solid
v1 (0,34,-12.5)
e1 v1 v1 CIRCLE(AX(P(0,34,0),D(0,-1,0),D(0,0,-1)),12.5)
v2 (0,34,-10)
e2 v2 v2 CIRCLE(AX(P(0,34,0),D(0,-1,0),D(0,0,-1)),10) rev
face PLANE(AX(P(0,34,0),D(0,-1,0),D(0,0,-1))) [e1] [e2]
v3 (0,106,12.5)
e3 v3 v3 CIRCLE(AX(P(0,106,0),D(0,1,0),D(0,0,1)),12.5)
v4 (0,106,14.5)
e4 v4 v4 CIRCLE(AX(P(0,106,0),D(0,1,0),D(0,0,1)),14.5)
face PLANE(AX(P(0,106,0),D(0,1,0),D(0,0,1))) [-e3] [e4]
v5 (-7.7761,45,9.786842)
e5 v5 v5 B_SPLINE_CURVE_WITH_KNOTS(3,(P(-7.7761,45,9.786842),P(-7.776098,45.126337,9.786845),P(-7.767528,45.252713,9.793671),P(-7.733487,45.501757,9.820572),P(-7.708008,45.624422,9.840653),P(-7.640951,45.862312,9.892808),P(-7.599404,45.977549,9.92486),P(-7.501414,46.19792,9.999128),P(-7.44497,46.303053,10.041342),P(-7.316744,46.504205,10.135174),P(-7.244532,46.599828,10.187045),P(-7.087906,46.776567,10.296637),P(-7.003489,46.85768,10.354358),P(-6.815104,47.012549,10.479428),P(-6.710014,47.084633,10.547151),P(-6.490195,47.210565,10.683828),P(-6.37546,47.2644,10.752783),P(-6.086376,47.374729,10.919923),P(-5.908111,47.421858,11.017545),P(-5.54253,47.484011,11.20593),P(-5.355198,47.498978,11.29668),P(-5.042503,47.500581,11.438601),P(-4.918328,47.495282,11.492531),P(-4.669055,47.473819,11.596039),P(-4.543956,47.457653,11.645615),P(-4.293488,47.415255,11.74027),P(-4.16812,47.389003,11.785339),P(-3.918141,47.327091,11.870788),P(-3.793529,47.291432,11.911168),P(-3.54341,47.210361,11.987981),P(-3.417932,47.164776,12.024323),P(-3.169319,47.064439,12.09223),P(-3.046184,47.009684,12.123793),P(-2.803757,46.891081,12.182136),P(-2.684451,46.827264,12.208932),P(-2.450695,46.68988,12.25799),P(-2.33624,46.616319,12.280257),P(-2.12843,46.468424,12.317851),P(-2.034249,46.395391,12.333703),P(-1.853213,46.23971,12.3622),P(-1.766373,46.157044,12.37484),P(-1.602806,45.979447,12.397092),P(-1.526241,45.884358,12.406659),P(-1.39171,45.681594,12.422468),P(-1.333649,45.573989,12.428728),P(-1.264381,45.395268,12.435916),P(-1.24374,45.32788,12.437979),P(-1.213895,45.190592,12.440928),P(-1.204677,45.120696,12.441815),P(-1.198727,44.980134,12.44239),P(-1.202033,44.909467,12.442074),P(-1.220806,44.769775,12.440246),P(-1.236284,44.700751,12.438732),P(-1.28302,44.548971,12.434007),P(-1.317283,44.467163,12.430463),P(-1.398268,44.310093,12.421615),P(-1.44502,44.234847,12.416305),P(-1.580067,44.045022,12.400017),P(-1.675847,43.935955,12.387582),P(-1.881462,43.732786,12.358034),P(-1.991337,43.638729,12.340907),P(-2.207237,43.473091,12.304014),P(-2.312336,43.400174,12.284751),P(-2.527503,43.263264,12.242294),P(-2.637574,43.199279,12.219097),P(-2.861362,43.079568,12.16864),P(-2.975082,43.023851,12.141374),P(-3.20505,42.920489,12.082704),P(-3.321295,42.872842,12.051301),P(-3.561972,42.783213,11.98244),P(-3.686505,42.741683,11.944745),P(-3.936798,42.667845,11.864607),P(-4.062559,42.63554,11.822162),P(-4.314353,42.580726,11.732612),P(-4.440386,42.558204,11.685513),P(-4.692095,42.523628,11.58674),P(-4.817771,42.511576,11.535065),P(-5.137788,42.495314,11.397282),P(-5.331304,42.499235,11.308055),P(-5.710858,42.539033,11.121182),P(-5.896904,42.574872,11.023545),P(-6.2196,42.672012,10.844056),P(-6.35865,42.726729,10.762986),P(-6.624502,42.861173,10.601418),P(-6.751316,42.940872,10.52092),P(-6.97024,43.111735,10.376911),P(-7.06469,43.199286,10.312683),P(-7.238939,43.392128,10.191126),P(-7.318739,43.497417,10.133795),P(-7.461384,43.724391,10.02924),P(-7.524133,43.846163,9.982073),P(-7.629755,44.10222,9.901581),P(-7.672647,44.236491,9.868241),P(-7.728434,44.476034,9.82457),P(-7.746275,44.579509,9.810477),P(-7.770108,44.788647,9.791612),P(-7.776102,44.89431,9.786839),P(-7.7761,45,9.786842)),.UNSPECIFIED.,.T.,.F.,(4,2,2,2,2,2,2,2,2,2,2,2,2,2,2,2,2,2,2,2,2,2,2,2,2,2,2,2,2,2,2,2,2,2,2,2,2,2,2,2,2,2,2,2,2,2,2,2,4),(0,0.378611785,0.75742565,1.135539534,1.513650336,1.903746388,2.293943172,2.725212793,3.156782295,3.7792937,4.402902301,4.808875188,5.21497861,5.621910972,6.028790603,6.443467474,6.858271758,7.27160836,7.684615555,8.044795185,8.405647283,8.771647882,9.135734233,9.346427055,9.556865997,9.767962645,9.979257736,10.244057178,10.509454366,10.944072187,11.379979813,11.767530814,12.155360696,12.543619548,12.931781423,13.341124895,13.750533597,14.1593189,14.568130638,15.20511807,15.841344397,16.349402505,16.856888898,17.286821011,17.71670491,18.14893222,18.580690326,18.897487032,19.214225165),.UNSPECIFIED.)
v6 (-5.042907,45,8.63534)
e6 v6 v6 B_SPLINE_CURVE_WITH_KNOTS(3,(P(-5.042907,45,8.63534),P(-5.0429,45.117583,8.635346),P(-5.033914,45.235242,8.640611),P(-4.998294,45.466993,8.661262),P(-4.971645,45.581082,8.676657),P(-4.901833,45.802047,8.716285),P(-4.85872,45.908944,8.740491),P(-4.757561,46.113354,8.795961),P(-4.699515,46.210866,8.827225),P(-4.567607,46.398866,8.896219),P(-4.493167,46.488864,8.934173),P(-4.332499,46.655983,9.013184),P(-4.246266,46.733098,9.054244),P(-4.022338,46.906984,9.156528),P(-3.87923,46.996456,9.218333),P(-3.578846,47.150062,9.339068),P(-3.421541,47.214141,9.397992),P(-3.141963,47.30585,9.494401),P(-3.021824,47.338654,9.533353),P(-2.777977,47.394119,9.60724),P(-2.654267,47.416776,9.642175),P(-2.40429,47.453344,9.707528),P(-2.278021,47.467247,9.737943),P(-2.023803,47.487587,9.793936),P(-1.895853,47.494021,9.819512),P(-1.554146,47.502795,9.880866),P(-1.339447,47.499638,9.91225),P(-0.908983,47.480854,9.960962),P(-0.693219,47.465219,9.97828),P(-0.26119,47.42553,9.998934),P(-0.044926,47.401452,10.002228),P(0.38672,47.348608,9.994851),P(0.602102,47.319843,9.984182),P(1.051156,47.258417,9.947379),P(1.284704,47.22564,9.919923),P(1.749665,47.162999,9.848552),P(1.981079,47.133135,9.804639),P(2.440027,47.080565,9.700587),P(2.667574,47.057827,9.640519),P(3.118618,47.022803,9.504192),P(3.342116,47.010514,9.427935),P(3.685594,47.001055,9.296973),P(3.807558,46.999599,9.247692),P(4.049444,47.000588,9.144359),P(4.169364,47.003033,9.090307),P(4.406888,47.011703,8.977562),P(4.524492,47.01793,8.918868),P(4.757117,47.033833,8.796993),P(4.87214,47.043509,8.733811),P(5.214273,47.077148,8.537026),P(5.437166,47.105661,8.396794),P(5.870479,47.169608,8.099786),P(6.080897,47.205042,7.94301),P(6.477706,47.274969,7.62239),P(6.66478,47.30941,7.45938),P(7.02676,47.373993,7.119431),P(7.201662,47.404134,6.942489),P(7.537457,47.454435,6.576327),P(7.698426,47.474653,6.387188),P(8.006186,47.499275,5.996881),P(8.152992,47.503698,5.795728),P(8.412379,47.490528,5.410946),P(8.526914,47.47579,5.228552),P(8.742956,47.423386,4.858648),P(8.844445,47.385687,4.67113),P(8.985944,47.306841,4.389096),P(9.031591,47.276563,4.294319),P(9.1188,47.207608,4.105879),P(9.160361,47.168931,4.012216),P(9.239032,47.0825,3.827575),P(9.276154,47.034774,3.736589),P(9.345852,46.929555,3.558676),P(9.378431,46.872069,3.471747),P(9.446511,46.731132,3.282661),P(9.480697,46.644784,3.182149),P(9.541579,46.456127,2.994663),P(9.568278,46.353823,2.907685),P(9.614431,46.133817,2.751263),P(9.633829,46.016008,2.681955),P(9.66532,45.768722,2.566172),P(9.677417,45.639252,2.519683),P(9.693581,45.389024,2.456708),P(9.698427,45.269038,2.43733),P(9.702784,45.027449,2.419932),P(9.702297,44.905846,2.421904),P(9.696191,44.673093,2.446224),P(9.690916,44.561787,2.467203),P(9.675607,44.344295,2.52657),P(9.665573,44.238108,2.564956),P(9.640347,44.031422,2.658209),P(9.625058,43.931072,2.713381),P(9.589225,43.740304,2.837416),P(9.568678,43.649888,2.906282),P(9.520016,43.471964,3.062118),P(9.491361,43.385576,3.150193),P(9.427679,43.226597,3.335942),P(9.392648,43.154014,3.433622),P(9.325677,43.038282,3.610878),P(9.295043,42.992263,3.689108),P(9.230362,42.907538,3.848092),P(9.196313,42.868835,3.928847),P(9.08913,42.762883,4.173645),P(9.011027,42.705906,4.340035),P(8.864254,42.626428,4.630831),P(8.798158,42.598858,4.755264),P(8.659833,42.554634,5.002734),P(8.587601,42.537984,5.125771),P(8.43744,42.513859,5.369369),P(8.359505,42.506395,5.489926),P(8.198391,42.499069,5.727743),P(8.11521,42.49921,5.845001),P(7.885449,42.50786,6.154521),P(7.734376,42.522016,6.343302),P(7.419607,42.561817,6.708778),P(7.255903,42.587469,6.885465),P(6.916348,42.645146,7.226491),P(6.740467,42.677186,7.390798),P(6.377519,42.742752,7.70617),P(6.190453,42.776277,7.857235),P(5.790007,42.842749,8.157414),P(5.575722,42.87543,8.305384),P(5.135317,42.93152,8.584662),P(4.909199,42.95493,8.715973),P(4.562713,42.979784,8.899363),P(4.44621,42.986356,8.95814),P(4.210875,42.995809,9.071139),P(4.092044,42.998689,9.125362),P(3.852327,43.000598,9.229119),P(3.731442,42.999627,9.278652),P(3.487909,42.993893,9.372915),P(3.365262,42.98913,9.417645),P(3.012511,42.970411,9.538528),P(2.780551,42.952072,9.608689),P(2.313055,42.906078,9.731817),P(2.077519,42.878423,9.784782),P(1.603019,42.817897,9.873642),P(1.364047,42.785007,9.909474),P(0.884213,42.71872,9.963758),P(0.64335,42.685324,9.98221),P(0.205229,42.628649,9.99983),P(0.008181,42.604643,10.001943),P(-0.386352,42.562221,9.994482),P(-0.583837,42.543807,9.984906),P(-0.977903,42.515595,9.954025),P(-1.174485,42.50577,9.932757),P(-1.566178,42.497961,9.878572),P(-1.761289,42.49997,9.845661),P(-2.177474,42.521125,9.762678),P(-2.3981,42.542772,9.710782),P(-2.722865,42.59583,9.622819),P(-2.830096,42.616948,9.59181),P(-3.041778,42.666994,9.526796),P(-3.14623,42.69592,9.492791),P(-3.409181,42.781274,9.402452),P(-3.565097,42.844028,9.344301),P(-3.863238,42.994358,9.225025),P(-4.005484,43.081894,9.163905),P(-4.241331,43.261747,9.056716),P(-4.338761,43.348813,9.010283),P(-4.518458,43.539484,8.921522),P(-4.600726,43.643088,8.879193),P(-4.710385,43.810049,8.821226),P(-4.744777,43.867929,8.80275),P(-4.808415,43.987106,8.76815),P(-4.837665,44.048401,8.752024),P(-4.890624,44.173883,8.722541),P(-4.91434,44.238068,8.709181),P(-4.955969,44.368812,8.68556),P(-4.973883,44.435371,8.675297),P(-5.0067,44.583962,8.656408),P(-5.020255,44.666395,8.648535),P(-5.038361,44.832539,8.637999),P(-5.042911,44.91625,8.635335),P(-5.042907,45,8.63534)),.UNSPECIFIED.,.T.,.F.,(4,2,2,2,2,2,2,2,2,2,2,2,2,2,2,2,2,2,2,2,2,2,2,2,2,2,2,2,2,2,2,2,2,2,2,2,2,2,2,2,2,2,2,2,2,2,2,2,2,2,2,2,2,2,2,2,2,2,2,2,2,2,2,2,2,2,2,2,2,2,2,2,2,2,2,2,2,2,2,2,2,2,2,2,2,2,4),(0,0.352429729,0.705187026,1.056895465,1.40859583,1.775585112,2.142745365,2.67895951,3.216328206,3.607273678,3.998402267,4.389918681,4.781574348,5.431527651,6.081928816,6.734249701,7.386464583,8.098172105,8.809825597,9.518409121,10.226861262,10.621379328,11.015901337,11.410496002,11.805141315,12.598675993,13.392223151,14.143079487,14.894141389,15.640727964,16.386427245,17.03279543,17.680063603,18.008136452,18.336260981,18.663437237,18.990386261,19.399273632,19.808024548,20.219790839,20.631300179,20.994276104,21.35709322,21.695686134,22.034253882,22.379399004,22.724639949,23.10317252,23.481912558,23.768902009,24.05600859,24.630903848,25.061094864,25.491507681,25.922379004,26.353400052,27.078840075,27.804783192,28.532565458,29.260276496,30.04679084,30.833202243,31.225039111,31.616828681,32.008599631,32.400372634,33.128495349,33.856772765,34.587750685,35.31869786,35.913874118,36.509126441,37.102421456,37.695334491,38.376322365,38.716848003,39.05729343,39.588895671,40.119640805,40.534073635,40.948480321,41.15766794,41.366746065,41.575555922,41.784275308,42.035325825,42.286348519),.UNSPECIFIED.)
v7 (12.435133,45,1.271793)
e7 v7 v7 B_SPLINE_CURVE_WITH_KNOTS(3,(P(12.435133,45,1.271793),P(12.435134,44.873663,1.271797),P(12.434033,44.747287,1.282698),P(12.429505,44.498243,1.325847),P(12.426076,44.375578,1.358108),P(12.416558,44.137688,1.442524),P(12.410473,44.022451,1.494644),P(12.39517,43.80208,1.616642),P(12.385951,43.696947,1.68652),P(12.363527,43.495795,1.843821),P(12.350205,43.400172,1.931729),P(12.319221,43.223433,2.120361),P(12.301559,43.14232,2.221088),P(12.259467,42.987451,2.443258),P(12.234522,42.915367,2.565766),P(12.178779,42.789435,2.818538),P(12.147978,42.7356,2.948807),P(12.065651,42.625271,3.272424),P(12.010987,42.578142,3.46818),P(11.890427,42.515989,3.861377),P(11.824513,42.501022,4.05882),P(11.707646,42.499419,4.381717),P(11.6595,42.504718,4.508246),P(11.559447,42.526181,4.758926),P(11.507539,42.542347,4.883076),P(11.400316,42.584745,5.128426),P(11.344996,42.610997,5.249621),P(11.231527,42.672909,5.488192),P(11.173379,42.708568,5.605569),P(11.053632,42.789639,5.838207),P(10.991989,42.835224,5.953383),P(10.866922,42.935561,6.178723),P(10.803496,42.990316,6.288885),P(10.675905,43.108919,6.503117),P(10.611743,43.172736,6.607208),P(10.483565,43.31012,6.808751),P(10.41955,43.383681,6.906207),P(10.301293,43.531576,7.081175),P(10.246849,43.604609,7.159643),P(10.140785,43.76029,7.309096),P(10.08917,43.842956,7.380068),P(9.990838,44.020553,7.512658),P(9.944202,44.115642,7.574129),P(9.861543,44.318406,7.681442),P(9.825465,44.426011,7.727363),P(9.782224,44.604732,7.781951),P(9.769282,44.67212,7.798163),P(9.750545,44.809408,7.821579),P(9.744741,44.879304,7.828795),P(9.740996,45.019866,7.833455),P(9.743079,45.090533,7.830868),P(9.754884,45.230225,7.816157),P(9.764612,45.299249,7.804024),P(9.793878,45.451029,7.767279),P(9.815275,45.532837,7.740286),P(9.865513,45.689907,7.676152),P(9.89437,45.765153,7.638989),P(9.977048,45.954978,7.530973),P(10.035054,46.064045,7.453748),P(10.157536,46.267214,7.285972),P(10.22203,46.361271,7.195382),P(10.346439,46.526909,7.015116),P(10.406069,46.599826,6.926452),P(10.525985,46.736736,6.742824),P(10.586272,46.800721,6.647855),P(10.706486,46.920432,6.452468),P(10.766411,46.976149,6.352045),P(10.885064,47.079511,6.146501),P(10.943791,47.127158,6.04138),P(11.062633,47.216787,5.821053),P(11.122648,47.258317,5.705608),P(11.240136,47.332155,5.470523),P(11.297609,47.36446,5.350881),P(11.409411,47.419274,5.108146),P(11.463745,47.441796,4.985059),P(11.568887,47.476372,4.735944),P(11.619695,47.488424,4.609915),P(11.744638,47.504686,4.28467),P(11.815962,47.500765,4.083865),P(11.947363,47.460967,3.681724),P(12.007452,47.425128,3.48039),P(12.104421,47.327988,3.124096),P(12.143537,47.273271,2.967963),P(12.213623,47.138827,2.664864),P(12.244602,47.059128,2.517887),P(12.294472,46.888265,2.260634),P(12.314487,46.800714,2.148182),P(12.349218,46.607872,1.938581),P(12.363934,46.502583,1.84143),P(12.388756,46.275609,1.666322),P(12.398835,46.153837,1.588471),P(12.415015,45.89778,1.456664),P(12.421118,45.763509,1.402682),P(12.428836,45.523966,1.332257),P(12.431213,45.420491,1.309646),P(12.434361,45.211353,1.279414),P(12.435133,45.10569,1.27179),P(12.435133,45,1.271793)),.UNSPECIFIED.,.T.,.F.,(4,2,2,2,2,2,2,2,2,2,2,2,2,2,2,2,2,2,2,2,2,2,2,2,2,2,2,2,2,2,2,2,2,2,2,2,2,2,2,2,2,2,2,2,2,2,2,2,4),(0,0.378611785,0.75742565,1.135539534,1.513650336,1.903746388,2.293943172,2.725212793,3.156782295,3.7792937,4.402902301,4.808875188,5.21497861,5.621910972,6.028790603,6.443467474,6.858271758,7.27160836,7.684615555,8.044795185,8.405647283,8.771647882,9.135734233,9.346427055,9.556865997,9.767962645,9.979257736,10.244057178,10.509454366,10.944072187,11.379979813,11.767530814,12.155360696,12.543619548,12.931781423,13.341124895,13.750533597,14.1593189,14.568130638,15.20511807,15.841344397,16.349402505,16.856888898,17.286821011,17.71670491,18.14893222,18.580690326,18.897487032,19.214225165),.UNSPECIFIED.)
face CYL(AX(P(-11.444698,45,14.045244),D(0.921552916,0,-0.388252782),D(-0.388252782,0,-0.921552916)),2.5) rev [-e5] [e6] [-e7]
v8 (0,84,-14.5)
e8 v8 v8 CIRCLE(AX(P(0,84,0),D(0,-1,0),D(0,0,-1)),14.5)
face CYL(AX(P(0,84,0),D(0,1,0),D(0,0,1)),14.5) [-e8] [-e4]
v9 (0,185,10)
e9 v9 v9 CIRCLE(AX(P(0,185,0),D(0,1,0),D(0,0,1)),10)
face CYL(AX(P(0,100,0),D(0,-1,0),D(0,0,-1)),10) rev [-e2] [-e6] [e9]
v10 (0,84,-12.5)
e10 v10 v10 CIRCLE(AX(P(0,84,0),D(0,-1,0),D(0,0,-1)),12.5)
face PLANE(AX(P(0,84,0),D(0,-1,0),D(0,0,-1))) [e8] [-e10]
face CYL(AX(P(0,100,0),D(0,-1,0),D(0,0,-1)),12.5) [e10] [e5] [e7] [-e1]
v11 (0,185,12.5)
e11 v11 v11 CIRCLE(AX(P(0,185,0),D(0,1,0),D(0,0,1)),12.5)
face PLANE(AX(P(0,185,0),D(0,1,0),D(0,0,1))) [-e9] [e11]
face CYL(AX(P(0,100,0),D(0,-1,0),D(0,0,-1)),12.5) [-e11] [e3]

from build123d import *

# Parameters (mm, degrees)
SKETCH1_R                = 12.5
SKETCH1_R_2              = 10
BOSS_EXTRUDE1_DEPTH      = 100
BOSS_EXTRUDE2_DEPTH      = 85
BOSS_EXTRUDE2_DEPTH_BACK = 4
SKETCH6_R                = 12.5
SKETCH6_R_2              = 10
BOSS_EXTRUDE3_START      = -84
SKETCH7_R                = 14.5
SKETCH7_R_2              = 10
BOSS_EXTRUDE3_DEPTH      = 1
CUT_EXTRUDE1_DEPTH       = 187.133016953
CUT_EXTRUDE1_DEPTH_BACK  = 187.133016953
SKETCH11_W               = 35.010034018
SKETCH11_H               = 2.4
CUT_EXTRUDE3_DEPTH       = 187.133016953
CUT_EXTRUDE3_DEPTH_BACK  = 187.133016953
SKETCH13_W               = 31.609051685
SKETCH13_H               = 42.8
SKETCH14_R               = 14.5
BOSS_EXTRUDE4_DEPTH      = 21
SKETCH15_R               = 10
CUT_EXTRUDE4_DEPTH       = 22
BOSS_EXTRUDE5_START      = 10
SKETCH17_R               = 12.5
SKETCH17_R_2             = 10
BOSS_EXTRUDE5_DEPTH      = 10
SKETCH18_R               = 2.5
CUT_EXTRUDE5_DEPTH       = 54


with BuildPart() as part:
    # Sketch1 → Boss-Extrude1 (new body)
    with BuildSketch(Plane(origin=(0, 0, 0), x_dir=(1, 0, 0), z_dir=(0, 1, 0))):
        Circle(SKETCH1_R)
        Circle(SKETCH1_R_2, mode=Mode.SUBTRACT)
    extrude(amount=BOSS_EXTRUDE1_DEPTH)

    # Sketch6 → Boss-Extrude2 (add, two sides: drawn at the far end of the back side and taken through both)
    with BuildSketch(Plane(origin=(0, 100, 0), x_dir=(1, 0, 0), z_dir=(0, 1, 0)).offset(-BOSS_EXTRUDE2_DEPTH_BACK)):
        Circle(SKETCH6_R)
        Circle(SKETCH6_R_2, mode=Mode.SUBTRACT)
    extrude(amount=BOSS_EXTRUDE2_DEPTH + BOSS_EXTRUDE2_DEPTH_BACK)

    # Sketch7 → Boss-Extrude3 (add)
    with BuildSketch(Plane.XZ.offset(BOSS_EXTRUDE3_START)):
        Circle(SKETCH7_R)
        Circle(SKETCH7_R_2, mode=Mode.SUBTRACT)
    extrude(amount=-BOSS_EXTRUDE3_DEPTH)

    # Sketch11 → Cut-Extrude1 (cut, two sides: drawn at the far end of the back side and taken through both)
    with BuildSketch(Plane(origin=(0, 0, 0), x_dir=(0, 0, -1), z_dir=(1, 0, 0)).offset(-CUT_EXTRUDE1_DEPTH_BACK)):
        Rectangle(SKETCH11_W, SKETCH11_H)
    extrude(amount=CUT_EXTRUDE1_DEPTH + CUT_EXTRUDE1_DEPTH_BACK, mode=Mode.SUBTRACT)

    # Sketch13 → Cut-Extrude3 (cut, two sides: drawn at the far end of the back side and taken through both)
    with BuildSketch(Plane.XY.offset(-CUT_EXTRUDE3_DEPTH_BACK)):
        with Locations((3.304525843, 22.6)):
            Rectangle(SKETCH13_W, SKETCH13_H)
    extrude(amount=CUT_EXTRUDE3_DEPTH + CUT_EXTRUDE3_DEPTH_BACK, mode=Mode.SUBTRACT)

    # Sketch14 → Boss-Extrude4 (add)
    with BuildSketch(Plane(origin=(0, 85, 0), x_dir=(1, 0, 0), z_dir=(0, 1, 0))):
        Circle(SKETCH14_R)
    extrude(amount=BOSS_EXTRUDE4_DEPTH)

    # Sketch15 → Cut-Extrude4 (cut)
    with BuildSketch(Plane.XZ.offset(-85)):
        Circle(SKETCH15_R)
    extrude(amount=-CUT_EXTRUDE4_DEPTH, mode=Mode.SUBTRACT)

    # Sketch17 → Boss-Extrude5 (add)
    with BuildSketch(Plane.XZ.offset(-44).offset(BOSS_EXTRUDE5_START)):
        Circle(SKETCH17_R)
        Circle(SKETCH17_R_2, mode=Mode.SUBTRACT)
    extrude(amount=-BOSS_EXTRUDE5_DEPTH)

    # Sketch18 → Cut-Extrude5 (cut)
    with BuildSketch(Plane(origin=(35.019010809, 0, -14.753605728), x_dir=(-0.38825278231327914, 1.212401304802914e-15, -0.9215529160205601), z_dir=(0.9215529160205602, -2.877743595734803e-15, -0.3882527823132792))):
        with Locations((-8.5, 45)):
            Circle(SKETCH18_R)
    extrude(amount=-CUT_EXTRUDE5_DEPTH, mode=Mode.SUBTRACT)


solid = part.part
